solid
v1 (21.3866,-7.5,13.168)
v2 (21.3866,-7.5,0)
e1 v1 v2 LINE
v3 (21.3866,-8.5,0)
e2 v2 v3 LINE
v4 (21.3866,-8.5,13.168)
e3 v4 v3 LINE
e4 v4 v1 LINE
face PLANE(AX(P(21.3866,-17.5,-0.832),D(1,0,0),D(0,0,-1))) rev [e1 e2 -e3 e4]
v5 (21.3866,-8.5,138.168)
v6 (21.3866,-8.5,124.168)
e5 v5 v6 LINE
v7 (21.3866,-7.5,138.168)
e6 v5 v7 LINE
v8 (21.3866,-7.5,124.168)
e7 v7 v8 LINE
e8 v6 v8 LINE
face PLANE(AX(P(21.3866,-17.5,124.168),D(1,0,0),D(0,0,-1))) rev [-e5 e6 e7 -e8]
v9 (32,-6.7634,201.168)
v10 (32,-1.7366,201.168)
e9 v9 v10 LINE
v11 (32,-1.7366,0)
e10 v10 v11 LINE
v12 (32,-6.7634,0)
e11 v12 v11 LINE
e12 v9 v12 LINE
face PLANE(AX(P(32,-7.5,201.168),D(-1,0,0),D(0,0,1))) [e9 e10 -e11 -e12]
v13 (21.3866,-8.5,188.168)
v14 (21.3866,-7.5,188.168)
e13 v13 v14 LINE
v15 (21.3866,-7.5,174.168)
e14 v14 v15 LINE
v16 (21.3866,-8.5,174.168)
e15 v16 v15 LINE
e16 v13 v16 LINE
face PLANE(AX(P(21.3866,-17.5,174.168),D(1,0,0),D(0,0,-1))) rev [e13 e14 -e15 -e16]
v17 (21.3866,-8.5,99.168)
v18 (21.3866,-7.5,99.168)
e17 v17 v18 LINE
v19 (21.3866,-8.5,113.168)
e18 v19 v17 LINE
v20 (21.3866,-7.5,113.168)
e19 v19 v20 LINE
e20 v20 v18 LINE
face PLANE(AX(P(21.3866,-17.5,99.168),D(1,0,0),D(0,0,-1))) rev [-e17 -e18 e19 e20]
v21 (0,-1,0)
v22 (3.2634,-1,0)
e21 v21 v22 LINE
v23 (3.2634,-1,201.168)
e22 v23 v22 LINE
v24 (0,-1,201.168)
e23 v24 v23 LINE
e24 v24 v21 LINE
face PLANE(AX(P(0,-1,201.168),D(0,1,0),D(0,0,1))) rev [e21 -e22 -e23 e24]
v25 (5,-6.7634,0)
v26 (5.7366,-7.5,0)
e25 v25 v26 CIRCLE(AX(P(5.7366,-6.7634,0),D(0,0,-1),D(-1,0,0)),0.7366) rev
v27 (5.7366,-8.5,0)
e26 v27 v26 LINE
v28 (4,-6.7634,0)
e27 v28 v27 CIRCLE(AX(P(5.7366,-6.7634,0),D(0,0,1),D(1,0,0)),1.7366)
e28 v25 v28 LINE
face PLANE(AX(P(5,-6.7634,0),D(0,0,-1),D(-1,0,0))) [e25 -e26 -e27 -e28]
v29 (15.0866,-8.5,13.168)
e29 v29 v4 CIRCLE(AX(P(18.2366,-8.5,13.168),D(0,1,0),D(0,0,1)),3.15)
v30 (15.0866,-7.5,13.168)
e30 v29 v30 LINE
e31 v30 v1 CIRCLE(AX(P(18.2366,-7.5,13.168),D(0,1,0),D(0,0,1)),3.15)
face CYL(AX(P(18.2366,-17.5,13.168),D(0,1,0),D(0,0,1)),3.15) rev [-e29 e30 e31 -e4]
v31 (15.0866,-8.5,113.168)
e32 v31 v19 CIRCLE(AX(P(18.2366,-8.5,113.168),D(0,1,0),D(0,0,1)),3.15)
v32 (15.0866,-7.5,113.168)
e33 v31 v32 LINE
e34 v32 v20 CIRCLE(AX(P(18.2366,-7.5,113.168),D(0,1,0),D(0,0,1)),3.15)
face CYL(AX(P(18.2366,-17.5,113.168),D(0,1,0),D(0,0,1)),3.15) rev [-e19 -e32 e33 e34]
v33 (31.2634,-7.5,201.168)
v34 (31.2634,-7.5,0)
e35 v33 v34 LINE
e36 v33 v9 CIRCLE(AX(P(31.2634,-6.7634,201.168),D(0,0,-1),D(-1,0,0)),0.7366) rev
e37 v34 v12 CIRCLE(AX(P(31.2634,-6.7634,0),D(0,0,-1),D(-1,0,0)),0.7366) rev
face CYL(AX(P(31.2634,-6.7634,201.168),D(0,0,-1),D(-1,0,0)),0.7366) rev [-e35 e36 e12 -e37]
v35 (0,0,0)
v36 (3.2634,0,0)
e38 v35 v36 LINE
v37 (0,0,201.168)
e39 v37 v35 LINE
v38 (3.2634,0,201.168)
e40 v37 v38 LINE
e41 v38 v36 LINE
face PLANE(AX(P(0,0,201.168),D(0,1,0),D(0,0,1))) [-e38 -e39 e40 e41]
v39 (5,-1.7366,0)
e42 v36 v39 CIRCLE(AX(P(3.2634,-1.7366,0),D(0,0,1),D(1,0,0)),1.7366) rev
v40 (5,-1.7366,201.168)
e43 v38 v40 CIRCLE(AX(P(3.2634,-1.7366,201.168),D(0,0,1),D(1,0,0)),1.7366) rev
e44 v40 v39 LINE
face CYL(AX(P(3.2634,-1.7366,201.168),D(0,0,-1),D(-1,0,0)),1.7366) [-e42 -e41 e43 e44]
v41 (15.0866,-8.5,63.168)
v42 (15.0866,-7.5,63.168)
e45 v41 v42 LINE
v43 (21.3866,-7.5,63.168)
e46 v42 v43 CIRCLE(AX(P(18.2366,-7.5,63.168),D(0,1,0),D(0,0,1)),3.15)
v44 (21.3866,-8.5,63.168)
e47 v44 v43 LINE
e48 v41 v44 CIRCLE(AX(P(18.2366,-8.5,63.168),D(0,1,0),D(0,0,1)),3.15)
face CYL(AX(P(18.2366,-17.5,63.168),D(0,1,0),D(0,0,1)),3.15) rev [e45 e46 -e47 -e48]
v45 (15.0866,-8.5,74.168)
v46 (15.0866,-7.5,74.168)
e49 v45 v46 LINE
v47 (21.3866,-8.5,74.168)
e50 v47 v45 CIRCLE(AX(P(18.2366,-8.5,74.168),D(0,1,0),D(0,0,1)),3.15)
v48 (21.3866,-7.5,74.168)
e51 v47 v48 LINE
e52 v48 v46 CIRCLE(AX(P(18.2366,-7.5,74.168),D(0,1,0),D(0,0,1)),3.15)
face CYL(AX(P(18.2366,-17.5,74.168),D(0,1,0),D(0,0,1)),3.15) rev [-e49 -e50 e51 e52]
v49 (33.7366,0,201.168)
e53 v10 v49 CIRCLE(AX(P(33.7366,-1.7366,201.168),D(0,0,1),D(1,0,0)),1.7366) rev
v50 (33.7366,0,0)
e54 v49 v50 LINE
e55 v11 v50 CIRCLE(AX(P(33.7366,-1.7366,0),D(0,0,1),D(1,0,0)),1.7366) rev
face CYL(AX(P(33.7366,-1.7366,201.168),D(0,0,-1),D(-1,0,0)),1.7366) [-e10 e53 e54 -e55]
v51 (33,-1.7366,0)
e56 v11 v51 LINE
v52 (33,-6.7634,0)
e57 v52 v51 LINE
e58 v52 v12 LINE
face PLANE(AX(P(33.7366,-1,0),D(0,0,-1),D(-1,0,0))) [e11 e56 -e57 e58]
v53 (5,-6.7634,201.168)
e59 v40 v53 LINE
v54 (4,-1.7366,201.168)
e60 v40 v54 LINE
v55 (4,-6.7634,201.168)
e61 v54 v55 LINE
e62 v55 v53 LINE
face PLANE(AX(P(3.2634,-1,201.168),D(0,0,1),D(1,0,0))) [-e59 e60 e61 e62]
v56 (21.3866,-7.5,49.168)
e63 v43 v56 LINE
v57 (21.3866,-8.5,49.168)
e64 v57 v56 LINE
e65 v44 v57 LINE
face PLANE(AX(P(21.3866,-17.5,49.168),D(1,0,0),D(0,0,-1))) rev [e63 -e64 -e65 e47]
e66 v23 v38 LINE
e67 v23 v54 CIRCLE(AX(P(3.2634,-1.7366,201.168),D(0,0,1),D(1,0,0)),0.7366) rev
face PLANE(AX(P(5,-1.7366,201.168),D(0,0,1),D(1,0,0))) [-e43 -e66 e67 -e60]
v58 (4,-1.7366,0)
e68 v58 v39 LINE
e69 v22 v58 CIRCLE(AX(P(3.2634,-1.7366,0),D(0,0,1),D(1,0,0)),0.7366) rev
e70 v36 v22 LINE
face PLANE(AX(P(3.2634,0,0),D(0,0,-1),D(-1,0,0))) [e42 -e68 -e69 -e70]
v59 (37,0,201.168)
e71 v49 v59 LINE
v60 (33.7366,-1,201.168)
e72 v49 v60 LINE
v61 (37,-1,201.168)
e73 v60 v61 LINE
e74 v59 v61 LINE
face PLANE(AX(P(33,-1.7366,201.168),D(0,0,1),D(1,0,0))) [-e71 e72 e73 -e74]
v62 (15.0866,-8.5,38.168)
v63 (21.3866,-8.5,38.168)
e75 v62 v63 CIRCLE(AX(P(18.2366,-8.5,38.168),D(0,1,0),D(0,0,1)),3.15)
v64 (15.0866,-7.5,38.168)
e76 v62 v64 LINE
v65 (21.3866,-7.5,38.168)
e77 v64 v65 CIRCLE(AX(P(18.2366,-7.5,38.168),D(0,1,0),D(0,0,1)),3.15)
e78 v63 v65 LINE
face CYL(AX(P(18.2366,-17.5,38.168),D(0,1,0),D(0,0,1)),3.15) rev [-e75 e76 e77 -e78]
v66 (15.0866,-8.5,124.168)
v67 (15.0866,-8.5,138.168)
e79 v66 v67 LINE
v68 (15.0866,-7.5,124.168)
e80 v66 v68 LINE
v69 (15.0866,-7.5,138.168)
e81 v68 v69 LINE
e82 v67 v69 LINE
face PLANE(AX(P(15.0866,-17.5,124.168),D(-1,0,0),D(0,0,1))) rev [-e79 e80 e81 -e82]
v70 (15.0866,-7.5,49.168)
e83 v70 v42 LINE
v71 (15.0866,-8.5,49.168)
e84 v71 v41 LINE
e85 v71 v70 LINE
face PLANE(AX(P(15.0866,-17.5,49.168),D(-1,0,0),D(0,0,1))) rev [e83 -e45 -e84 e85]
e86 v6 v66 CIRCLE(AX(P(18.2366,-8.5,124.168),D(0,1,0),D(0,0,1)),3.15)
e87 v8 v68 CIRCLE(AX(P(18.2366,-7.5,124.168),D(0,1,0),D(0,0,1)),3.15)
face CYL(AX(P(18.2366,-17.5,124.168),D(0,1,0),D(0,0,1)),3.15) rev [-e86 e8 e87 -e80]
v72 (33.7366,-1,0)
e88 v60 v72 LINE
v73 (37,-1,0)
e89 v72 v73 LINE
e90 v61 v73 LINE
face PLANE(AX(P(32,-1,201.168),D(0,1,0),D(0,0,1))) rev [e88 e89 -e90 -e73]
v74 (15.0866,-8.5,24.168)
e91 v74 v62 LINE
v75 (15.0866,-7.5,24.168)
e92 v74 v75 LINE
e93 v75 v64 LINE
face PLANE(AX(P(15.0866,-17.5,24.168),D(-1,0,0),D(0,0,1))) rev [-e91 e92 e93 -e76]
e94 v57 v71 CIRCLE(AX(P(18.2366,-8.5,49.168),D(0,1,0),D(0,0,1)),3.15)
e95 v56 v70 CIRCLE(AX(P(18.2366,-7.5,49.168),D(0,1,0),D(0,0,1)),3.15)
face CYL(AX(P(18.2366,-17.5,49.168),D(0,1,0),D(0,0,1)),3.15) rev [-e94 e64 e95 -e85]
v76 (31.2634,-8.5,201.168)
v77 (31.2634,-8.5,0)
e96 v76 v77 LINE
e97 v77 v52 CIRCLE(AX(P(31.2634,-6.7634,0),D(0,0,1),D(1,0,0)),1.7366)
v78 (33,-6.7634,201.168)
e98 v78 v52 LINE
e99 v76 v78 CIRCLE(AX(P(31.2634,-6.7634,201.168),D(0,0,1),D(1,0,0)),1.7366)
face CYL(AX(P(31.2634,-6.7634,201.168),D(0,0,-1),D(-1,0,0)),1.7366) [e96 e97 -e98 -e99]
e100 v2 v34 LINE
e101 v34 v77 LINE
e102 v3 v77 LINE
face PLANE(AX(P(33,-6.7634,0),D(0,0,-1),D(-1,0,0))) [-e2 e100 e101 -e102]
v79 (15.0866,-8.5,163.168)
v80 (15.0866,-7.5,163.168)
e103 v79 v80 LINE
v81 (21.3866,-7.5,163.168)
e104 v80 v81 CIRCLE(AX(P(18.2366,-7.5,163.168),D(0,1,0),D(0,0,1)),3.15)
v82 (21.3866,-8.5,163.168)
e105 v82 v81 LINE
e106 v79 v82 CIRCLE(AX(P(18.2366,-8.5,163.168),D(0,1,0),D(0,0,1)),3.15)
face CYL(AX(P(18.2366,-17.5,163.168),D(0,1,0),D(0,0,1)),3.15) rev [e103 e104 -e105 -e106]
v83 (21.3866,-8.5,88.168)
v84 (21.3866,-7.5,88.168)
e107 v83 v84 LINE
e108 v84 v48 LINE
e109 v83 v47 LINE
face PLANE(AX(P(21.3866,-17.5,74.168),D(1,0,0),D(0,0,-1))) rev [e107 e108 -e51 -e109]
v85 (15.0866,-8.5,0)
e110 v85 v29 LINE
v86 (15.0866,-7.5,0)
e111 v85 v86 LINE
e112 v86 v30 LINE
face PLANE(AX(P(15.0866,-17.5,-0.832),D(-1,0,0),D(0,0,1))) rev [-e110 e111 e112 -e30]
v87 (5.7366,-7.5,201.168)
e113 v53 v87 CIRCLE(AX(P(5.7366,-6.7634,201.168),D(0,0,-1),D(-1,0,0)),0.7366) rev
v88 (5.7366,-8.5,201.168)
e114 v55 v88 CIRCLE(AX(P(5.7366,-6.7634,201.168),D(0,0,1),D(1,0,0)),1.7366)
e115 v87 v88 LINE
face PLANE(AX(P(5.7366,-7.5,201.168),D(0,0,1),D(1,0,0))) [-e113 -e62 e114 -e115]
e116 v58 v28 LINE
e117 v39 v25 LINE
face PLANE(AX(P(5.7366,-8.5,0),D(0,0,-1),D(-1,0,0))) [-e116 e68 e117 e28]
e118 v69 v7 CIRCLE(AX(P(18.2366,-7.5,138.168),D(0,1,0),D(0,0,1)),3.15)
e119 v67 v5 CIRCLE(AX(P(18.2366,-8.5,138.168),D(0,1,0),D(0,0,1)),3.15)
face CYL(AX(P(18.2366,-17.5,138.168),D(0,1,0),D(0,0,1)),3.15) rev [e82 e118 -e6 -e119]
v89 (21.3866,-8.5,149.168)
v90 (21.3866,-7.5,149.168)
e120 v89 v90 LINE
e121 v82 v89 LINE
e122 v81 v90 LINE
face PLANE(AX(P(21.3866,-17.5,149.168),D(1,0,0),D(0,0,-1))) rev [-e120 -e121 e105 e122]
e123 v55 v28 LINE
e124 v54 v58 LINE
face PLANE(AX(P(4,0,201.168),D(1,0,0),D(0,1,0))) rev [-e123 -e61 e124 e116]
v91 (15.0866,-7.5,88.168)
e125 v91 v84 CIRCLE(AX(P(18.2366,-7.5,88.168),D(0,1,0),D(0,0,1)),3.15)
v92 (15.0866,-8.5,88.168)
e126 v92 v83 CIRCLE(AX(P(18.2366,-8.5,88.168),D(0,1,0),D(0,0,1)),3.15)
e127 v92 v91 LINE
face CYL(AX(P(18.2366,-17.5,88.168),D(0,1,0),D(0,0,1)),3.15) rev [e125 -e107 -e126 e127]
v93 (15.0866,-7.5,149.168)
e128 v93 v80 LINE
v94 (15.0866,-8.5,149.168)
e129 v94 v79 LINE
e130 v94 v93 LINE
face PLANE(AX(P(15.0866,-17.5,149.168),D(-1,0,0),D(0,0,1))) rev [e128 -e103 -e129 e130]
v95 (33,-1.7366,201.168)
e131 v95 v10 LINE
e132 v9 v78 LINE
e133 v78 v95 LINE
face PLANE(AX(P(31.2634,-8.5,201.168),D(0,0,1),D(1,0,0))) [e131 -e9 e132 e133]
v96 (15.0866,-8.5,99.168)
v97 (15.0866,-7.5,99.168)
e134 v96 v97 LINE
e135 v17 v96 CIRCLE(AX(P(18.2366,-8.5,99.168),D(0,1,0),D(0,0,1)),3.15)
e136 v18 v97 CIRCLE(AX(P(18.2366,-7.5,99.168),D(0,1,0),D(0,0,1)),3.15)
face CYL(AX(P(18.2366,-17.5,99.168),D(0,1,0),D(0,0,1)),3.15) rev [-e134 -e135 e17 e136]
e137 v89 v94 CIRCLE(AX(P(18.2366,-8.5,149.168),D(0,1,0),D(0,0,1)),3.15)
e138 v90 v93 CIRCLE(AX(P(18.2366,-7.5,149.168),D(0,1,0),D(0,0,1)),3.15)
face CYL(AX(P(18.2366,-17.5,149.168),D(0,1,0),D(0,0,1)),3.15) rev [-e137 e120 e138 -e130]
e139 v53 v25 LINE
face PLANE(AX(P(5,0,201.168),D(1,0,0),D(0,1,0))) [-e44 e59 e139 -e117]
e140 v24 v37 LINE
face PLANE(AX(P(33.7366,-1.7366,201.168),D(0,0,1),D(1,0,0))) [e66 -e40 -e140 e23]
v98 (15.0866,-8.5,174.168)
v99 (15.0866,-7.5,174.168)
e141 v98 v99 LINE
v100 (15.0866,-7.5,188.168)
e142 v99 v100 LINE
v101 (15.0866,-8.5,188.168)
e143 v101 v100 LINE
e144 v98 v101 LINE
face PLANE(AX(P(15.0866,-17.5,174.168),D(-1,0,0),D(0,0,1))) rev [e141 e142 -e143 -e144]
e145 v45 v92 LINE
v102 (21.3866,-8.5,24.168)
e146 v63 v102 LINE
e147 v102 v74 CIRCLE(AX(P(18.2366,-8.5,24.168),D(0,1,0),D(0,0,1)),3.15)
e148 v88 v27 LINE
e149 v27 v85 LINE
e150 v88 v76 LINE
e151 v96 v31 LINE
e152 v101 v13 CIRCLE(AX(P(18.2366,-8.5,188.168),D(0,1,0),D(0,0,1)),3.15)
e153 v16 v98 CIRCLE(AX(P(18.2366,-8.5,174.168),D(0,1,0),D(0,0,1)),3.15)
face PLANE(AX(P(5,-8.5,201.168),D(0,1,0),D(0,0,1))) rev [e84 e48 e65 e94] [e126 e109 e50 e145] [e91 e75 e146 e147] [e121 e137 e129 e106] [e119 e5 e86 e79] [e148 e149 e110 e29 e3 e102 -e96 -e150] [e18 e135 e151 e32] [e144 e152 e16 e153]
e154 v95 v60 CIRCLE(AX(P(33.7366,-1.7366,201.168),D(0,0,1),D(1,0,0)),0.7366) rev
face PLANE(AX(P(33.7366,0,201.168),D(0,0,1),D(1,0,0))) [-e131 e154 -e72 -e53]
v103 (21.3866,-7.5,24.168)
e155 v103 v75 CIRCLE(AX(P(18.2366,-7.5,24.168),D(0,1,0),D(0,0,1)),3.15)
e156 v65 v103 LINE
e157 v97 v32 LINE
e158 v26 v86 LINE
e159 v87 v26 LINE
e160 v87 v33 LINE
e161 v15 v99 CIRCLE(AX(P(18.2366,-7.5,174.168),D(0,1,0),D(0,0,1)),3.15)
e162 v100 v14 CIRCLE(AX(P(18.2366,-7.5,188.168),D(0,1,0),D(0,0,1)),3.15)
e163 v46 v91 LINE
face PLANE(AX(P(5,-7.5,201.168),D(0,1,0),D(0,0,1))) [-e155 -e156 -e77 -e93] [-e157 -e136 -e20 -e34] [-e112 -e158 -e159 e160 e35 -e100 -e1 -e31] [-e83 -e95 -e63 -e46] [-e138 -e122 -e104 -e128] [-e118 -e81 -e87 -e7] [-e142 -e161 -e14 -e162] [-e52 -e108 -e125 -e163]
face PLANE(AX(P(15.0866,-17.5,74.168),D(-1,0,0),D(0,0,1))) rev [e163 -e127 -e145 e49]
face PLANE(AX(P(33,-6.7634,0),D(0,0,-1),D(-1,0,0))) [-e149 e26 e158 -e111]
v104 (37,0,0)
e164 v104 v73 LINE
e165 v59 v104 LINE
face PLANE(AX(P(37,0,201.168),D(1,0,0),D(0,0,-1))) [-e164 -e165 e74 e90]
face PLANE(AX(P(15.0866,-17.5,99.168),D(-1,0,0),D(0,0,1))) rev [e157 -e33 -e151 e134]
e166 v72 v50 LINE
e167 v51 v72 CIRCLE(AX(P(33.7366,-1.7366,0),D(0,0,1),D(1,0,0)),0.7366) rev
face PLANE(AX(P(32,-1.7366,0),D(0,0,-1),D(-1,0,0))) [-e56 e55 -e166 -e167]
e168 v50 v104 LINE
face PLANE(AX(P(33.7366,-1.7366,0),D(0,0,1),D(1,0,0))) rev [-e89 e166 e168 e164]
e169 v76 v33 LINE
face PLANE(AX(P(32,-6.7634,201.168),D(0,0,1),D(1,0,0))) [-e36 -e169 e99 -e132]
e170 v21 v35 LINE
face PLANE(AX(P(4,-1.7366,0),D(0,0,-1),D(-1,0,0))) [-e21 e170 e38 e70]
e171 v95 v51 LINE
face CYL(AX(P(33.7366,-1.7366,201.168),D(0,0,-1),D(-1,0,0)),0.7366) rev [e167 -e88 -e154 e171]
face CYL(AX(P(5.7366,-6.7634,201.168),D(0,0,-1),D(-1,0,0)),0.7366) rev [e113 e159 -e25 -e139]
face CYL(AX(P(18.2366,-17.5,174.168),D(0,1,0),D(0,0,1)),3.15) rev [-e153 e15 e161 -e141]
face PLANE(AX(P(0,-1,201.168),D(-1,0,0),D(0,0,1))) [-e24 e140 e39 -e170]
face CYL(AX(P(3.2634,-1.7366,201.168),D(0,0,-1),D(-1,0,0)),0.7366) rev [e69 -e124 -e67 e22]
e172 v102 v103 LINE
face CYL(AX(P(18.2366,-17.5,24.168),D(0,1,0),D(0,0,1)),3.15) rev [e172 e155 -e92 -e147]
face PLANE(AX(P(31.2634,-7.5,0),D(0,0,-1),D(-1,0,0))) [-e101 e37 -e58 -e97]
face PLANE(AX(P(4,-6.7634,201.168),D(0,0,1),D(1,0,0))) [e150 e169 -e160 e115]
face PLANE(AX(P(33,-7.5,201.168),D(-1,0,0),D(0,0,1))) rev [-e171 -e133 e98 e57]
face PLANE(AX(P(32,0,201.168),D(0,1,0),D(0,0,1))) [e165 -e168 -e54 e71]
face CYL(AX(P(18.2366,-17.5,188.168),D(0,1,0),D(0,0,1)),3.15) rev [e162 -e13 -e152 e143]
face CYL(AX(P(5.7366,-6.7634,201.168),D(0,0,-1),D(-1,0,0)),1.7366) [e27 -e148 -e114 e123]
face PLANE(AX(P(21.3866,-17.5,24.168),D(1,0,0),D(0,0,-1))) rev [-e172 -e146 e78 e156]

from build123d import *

# Parameters (mm, degrees)
BASE_FLANGE1_DEPTH = 201.168
CUT_EXTRUDE1_DEPTH = 10
LPATTERN1_COUNT    = 11
LPATTERN1_PITCH    = 25


# Sheet-metal steps are written as plain solids
with BuildPart() as part:
    # Sketch1 → Base-Flange1 (new body)
    with BuildSketch(Plane.XY):
        with BuildLine():
            Line((0, 0), (3.2634, 0))
            ThreePointArc((3.2634, 0), (4.491361636, -0.508638364), (5, -1.7366))
            Line((5, -1.7366), (5, -6.7634))
            ThreePointArc((5, -6.7634), (5.215745145, -7.284254855), (5.7366, -7.5))
            Line((5.7366, -7.5), (31.2634, -7.5))
            ThreePointArc((31.2634, -7.5), (31.784254855, -7.284254855), (32, -6.7634))
            Line((32, -6.7634), (32, -1.7366))
            ThreePointArc((32, -1.7366), (32.508638364, -0.508638364), (33.7366, 0))
            Line((33.7366, 0), (37, 0))
            Line((37, 0), (37, -1))
            Line((37, -1), (33.7366, -1))
            ThreePointArc((33.7366, -1), (33.215745145, -1.215745145), (33, -1.7366))
            Line((33, -1.7366), (33, -6.7634))
            ThreePointArc((33, -6.7634), (32.491361636, -7.991361636), (31.2634, -8.5))
            Line((31.2634, -8.5), (5.7366, -8.5))
            ThreePointArc((5.7366, -8.5), (4.508638364, -7.991361636), (4, -6.7634))
            Line((4, -6.7634), (4, -1.7366))
            ThreePointArc((4, -1.7366), (3.784254855, -1.215745145), (3.2634, -1))
            Line((3.2634, -1), (0, -1))
            Line((0, -1), (0, 0))
        make_face()
    extrude(amount=BASE_FLANGE1_DEPTH)

    # Sketch6 → Cut-Extrude1 (cut)
    with BuildSketch(Plane(origin=(0, -7.5, 0), x_dir=(1, 0, 0), z_dir=(0, 1, 0))):
        with BuildLine():
            Line((21.3866, -174.168), (21.3866, -188.168))
            ThreePointArc((21.3866, -188.168), (18.2366, -191.318), (15.0866, -188.168))
            Line((15.0866, -188.168), (15.0866, -174.168))
            ThreePointArc((15.0866, -174.168), (18.2366, -171.018), (21.3866, -174.168))
        make_face()
    cut_extrude1 = extrude(amount=-CUT_EXTRUDE1_DEPTH, mode=Mode.SUBTRACT)

    # LPattern1: Cut-Extrude1 ×11
    with Locations(*[(0, 0, -i * LPATTERN1_PITCH) for i in range(1, LPATTERN1_COUNT)]):
        add(cut_extrude1, mode=Mode.SUBTRACT)


solid = part.part
